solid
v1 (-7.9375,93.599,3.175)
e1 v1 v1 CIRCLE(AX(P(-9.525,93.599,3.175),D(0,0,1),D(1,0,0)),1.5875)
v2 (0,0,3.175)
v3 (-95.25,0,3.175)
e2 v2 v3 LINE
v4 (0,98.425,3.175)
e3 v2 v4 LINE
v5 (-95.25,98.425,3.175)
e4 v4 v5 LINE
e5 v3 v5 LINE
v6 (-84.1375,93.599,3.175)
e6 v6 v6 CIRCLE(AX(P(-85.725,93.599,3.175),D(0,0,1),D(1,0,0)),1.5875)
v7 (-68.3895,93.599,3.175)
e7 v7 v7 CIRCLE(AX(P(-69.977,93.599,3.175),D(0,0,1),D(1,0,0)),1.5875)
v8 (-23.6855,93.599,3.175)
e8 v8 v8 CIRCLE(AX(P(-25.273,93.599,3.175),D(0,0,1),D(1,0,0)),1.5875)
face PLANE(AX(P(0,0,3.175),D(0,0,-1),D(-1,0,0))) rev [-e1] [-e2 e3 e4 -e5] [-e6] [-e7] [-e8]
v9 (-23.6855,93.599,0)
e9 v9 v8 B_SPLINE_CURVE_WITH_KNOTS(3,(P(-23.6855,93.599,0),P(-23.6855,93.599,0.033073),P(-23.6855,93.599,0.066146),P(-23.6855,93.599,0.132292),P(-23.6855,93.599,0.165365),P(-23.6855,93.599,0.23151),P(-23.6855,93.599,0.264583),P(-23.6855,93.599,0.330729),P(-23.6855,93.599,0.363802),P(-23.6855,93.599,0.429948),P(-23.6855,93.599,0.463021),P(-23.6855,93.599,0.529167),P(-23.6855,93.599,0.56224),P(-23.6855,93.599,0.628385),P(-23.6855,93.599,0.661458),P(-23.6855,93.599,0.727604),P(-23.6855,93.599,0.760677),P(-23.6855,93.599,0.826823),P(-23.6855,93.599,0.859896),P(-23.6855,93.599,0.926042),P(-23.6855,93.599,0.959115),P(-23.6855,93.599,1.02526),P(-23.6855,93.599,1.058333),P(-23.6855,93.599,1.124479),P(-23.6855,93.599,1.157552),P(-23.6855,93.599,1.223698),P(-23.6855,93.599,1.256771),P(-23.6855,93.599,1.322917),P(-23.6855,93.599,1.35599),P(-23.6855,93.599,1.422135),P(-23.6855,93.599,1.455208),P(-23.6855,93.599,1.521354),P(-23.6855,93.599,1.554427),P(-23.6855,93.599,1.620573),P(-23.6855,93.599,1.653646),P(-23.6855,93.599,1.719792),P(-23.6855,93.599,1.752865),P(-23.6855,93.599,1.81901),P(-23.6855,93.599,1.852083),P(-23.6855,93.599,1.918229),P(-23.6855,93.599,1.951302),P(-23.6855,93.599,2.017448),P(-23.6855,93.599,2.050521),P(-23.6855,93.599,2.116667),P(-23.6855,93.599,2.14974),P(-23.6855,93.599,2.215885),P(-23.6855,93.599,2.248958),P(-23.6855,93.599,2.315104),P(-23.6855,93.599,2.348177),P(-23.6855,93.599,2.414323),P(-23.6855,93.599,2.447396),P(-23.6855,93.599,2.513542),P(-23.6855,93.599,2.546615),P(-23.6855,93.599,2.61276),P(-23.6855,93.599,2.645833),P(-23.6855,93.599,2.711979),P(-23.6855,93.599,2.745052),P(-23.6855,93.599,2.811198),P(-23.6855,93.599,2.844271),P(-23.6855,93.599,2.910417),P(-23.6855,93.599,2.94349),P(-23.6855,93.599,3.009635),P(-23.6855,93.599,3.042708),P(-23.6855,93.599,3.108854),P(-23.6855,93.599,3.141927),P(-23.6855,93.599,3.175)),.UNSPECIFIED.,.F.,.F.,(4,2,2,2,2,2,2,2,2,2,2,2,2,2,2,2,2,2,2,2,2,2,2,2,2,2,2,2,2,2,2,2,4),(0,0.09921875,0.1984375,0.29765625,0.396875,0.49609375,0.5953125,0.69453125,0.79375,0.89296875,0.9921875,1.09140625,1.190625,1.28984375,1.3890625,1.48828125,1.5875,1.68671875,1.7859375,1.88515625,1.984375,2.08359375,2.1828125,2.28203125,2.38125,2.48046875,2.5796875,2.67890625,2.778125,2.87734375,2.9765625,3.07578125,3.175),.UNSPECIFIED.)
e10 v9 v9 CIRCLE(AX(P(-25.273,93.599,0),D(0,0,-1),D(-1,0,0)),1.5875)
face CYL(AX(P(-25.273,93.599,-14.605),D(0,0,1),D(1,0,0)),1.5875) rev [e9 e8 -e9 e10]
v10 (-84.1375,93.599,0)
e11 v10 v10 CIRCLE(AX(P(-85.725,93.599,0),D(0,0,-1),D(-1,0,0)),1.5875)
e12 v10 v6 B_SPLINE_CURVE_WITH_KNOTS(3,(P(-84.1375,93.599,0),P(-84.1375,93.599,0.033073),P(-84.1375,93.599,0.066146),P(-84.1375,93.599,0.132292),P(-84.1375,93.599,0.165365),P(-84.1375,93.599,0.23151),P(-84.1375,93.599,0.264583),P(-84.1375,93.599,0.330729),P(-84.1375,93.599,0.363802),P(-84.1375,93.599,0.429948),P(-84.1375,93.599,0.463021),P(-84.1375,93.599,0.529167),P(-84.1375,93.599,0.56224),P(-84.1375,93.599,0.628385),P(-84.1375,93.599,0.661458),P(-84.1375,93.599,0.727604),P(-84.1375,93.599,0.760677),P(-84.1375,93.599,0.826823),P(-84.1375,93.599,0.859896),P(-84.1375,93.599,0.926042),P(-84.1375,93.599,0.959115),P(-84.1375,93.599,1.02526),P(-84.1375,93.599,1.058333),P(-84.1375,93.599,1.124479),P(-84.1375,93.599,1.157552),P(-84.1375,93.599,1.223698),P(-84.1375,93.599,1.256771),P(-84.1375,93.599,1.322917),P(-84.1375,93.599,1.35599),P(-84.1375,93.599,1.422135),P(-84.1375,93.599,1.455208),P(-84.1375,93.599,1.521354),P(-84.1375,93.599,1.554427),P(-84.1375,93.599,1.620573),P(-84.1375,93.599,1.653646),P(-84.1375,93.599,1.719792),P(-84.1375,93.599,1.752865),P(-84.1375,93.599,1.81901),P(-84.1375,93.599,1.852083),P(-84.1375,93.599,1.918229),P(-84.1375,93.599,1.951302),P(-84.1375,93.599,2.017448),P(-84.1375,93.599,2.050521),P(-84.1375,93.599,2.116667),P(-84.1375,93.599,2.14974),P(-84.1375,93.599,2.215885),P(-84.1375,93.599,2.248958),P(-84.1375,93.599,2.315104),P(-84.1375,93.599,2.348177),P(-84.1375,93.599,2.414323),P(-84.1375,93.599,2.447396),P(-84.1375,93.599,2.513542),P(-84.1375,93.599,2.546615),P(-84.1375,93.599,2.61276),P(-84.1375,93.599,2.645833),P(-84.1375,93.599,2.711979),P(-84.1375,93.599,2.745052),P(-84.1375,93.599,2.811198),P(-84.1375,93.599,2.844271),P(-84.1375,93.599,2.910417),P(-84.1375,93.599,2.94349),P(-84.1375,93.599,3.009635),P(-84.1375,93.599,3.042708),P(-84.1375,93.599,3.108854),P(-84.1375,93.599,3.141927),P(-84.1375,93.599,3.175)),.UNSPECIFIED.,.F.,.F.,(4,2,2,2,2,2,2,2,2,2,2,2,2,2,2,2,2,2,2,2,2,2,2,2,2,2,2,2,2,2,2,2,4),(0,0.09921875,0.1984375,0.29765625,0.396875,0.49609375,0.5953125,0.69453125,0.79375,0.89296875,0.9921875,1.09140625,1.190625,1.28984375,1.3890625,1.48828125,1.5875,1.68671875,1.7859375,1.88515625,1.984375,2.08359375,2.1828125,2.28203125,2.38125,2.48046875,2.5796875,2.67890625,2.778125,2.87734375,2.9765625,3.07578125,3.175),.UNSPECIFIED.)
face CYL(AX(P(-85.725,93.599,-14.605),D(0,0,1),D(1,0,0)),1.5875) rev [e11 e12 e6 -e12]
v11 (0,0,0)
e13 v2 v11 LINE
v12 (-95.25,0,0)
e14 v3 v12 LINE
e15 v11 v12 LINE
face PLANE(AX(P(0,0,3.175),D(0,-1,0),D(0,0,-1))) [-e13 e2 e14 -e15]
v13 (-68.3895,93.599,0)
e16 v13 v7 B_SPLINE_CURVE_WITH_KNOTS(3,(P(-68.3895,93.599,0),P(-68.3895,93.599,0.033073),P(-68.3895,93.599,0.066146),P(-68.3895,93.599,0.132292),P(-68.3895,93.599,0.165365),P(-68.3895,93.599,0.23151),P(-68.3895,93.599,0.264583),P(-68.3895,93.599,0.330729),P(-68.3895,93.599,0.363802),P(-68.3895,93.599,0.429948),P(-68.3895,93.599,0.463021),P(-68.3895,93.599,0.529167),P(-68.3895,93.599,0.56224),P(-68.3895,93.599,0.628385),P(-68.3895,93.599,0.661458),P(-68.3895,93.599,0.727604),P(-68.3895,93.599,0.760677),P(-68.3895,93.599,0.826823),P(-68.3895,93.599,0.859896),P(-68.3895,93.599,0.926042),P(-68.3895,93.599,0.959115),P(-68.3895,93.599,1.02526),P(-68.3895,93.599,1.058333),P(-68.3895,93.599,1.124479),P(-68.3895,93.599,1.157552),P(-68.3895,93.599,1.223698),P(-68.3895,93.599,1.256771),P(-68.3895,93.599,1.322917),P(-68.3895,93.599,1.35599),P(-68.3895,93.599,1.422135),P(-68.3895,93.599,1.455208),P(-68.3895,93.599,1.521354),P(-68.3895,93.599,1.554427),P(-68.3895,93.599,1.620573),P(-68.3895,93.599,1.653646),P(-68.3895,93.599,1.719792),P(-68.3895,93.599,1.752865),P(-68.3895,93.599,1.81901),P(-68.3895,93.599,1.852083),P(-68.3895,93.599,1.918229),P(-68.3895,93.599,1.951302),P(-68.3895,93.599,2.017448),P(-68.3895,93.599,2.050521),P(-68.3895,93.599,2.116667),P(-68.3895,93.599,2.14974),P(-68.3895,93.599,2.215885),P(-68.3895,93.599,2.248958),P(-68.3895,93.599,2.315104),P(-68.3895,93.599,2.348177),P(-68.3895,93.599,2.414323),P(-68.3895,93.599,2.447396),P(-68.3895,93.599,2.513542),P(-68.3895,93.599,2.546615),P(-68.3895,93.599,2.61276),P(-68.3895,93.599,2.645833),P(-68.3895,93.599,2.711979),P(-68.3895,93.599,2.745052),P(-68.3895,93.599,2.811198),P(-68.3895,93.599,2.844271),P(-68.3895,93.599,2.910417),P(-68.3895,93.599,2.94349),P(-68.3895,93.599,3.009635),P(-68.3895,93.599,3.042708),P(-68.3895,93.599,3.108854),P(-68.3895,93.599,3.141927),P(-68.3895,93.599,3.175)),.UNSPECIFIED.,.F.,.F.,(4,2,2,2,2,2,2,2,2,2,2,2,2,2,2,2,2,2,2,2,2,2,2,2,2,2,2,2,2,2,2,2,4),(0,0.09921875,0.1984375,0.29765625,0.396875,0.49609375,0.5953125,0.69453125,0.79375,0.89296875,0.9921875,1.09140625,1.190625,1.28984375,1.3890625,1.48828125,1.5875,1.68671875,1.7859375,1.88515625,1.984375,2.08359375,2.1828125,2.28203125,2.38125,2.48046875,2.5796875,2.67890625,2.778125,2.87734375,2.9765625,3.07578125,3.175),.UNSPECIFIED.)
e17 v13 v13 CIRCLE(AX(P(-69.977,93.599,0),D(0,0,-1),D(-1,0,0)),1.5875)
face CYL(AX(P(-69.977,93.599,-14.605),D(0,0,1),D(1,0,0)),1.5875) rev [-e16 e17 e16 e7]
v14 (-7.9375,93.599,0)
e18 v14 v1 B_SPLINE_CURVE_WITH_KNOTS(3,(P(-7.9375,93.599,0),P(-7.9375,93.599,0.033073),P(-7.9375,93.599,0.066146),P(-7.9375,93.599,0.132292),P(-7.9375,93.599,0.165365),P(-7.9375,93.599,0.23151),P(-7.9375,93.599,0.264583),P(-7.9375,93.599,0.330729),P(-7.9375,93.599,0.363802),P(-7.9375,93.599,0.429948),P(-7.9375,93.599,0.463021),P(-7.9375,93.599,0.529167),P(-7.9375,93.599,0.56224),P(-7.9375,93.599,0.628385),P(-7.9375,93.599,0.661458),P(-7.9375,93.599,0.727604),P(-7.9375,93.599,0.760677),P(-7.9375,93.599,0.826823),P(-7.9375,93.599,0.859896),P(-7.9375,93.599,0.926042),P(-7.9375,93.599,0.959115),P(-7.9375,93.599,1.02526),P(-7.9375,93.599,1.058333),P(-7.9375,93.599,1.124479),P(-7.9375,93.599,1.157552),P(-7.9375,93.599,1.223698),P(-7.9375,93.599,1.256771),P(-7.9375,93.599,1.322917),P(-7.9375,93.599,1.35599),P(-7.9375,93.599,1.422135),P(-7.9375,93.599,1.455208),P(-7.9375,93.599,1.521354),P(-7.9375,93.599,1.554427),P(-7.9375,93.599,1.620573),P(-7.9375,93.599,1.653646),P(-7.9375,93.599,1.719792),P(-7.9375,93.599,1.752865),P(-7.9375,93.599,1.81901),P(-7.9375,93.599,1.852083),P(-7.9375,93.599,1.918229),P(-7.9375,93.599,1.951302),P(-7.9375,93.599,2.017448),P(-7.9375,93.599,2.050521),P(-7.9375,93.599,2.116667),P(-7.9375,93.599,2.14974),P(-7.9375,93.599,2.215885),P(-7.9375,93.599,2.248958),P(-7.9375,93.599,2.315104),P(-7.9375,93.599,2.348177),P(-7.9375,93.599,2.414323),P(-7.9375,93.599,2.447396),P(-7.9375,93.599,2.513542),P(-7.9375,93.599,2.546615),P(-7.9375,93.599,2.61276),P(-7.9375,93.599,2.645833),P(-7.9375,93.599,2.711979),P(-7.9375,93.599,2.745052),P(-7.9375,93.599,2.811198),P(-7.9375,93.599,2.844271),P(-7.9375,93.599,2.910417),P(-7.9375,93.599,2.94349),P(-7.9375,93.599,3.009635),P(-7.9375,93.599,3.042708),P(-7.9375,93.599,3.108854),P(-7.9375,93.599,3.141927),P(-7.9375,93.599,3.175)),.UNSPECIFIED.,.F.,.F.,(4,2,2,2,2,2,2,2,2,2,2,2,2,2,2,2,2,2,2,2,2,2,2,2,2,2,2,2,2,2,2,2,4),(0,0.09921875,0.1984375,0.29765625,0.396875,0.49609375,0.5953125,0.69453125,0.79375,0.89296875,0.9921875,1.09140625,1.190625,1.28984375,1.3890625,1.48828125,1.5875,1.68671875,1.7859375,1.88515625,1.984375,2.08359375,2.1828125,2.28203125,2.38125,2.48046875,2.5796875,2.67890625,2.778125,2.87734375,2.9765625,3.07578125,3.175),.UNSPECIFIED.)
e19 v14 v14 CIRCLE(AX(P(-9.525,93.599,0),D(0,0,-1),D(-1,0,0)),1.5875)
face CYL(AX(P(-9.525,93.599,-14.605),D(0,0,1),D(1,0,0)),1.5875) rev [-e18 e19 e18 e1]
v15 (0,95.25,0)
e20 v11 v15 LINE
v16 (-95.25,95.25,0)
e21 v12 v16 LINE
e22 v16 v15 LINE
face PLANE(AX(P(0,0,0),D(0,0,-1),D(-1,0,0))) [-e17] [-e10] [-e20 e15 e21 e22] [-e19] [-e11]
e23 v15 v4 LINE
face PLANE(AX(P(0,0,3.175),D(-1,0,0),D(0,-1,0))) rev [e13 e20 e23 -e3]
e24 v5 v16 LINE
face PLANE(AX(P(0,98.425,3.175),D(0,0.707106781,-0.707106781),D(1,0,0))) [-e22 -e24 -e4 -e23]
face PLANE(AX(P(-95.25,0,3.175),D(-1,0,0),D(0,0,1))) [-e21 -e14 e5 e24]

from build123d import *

# Parameters (mm, degrees)
SKETCH1_W           = 95.25
SKETCH1_H           = 98.425
BOSS_EXTRUDE1_DEPTH = 3.175
CHAMFER1_SIZE       = 3.175
SKETCH2_R           = 1.5875
CUT_EXTRUDE1_DEPTH  = 17.78


with BuildPart() as part:
    # Sketch1 → Boss-Extrude1 (new body)
    with BuildSketch(Plane.XY):
        with Locations((-47.625, 49.2125)):
            Rectangle(SKETCH1_W, SKETCH1_H)
    extrude(amount=BOSS_EXTRUDE1_DEPTH)

    # Chamfer1
    chamfer1_edges = [part.edges().sort_by_distance(p)[0] for p in [
        (-47.625, 98.425, 0),
    ]]
    chamfer(chamfer1_edges, length=CHAMFER1_SIZE - 0.0001)  # a hair under: the kernel refuses the full size

    # Sketch2 → Cut-Extrude1 (cut)
    with BuildSketch(Plane.XY.offset(3.175)):
        with Locations((-85.725, 93.599)):
            Circle(SKETCH2_R)
        with Locations((-69.977, 93.599)):
            Circle(SKETCH2_R)
        with Locations((-25.273, 93.599)):
            Circle(SKETCH2_R)
        with Locations((-9.525, 93.599)):
            Circle(SKETCH2_R)
    extrude(amount=-CUT_EXTRUDE1_DEPTH, mode=Mode.SUBTRACT)


solid = part.part
